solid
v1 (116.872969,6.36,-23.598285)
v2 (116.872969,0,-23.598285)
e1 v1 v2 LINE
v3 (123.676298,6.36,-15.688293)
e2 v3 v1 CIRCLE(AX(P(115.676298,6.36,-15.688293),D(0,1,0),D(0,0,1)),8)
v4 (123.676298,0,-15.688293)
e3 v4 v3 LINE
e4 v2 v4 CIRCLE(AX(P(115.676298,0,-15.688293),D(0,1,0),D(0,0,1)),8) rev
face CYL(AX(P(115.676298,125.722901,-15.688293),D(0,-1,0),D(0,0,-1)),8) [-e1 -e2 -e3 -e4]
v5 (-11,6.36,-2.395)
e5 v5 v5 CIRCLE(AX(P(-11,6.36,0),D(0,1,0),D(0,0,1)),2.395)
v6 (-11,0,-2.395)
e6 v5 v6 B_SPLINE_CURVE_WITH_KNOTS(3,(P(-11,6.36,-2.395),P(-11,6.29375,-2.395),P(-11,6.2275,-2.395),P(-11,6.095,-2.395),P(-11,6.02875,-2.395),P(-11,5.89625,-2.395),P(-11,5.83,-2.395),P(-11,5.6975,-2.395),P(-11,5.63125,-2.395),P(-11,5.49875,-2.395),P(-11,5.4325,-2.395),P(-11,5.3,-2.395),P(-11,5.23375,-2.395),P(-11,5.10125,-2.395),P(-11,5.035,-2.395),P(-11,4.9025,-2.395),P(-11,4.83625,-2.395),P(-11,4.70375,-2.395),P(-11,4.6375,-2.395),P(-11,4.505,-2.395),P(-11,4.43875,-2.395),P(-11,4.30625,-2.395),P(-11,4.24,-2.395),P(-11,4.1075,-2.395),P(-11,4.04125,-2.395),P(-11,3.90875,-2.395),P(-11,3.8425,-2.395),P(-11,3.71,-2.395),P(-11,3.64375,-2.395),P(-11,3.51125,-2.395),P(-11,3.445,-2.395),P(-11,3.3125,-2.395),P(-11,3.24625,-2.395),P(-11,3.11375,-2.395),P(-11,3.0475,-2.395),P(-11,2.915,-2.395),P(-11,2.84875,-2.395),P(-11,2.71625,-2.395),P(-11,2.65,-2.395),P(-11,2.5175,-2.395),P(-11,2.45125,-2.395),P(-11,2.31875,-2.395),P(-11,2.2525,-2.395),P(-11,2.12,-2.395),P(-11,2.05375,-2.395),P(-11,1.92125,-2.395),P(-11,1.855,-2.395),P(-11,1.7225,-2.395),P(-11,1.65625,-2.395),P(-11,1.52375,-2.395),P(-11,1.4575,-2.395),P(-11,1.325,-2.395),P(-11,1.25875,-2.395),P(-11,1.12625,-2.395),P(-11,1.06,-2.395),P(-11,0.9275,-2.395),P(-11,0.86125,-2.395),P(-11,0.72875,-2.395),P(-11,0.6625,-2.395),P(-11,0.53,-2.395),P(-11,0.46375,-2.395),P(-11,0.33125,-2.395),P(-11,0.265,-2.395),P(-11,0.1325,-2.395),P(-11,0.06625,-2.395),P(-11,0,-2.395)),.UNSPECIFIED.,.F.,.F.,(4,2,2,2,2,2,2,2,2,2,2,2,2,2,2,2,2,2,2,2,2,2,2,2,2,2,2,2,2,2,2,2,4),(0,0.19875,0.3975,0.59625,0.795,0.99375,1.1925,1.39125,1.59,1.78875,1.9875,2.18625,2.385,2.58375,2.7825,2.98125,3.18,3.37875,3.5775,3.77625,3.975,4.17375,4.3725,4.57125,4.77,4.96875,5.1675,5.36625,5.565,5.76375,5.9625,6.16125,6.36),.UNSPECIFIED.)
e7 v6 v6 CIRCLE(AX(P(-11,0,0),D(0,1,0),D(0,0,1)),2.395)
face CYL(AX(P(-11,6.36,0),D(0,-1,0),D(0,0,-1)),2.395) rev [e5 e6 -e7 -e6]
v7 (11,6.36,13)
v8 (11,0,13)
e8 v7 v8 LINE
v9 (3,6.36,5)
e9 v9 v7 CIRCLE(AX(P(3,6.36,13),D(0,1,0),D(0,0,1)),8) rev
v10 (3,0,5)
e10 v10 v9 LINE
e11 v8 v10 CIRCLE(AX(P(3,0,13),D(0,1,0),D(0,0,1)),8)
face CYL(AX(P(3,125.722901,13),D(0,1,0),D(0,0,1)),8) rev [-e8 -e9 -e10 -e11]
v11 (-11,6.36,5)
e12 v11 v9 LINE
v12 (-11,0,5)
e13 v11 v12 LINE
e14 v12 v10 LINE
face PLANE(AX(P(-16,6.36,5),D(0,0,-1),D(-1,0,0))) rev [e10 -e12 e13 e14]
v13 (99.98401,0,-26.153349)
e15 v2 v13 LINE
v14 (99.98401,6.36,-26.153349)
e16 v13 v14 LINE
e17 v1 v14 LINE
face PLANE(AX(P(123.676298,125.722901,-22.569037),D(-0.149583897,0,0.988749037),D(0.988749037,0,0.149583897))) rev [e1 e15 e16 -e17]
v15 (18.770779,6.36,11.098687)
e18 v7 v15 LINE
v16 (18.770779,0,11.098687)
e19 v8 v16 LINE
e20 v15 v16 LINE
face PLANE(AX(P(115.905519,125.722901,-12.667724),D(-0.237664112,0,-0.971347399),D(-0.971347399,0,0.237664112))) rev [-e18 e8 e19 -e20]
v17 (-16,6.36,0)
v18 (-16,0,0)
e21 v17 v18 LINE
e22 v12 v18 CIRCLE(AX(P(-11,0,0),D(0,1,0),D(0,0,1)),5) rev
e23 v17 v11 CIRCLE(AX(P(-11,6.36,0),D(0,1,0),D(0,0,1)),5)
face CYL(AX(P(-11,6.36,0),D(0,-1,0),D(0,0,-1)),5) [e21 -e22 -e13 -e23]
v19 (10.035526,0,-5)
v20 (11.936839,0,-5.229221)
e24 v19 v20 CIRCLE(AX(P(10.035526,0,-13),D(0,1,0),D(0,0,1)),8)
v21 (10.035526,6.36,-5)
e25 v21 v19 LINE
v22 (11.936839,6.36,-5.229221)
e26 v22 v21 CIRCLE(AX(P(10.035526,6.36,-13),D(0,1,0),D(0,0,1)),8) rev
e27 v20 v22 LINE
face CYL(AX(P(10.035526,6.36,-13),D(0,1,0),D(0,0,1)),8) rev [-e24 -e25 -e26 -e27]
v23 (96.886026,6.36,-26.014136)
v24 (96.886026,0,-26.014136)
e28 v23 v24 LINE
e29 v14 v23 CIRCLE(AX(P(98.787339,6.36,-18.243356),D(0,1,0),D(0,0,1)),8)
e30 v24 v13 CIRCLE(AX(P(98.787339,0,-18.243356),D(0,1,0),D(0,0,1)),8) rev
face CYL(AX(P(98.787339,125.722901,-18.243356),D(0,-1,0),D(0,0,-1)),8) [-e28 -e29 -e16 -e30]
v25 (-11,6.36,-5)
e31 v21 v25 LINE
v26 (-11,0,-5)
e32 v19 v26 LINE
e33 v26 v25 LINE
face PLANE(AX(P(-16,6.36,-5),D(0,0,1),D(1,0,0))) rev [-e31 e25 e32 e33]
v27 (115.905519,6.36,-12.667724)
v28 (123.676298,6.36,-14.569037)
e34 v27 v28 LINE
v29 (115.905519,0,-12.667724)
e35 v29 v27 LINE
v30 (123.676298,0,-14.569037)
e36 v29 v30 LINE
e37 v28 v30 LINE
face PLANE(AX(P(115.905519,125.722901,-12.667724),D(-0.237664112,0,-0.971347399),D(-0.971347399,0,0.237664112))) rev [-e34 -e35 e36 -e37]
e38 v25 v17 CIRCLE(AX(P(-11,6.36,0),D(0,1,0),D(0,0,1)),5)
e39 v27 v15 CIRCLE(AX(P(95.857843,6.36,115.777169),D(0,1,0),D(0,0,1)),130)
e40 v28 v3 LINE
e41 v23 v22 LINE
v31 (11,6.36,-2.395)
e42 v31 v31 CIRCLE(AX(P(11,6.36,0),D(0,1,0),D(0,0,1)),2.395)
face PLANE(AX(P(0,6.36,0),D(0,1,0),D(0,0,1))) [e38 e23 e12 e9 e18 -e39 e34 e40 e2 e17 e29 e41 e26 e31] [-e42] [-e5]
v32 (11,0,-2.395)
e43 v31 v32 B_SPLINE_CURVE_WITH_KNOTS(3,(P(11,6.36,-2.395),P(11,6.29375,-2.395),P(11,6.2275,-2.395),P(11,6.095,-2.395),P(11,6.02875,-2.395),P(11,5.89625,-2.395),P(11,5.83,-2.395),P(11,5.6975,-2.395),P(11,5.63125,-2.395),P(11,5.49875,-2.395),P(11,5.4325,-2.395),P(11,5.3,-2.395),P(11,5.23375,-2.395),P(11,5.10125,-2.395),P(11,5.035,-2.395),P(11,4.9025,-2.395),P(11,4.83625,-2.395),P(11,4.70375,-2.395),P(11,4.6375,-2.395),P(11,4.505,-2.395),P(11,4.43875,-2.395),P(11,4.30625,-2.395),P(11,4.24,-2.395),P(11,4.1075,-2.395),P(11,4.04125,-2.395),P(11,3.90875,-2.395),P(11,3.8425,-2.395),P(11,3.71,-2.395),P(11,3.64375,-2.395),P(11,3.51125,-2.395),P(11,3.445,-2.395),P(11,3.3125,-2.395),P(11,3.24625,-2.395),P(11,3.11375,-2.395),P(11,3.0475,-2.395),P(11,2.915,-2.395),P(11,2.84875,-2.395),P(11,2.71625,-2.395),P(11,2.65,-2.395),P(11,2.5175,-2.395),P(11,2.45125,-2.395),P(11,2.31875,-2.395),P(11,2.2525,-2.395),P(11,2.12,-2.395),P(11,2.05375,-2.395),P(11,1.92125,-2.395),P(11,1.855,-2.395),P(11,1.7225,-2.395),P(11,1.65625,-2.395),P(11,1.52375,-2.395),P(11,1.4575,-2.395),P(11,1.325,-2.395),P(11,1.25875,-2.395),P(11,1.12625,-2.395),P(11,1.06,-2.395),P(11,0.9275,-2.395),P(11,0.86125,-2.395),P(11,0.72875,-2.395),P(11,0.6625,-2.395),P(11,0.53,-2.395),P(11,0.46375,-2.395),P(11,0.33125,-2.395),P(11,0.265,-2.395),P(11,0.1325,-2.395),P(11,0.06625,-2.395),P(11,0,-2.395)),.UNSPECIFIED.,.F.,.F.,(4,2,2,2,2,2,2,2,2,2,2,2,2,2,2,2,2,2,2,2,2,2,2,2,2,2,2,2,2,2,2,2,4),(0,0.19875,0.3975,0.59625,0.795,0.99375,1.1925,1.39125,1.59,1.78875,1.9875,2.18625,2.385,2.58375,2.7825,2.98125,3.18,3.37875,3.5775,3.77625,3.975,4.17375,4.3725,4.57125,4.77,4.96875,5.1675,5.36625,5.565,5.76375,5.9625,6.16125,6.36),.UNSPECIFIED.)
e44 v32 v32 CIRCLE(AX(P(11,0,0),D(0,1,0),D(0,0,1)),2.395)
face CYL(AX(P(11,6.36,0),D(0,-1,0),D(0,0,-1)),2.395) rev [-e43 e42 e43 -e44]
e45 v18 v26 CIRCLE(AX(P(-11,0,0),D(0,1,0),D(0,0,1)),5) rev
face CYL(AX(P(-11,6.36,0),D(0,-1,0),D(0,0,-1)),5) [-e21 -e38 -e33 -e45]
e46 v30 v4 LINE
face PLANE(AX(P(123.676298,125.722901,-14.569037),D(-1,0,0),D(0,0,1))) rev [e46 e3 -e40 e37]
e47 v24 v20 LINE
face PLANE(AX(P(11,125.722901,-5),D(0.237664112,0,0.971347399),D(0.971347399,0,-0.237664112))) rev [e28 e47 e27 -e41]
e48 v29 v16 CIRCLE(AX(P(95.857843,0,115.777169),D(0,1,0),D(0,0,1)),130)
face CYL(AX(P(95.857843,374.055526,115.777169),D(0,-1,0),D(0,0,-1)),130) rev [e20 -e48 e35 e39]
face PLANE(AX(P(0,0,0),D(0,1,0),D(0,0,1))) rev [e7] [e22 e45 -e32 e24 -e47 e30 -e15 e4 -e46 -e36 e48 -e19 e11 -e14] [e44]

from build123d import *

# Parameters (mm, degrees)
SKETCH_1_W          = 32
SKETCH_1_H          = 10
SKETCH_1_R          = 2.395
EXTRUDE_2_DEPTH     = 6.36
FILLET_4_R          = 5
EXTRUDE_3_DEPTH     = 6.36
FILLET_5_R          = 8
FILLET_6_R          = 8
SKETCH_3_R          = 130
CUT_EXTRUDE_2_DEPTH = 6.36


with BuildPart() as part:
    # 草图1 → 凸台-拉伸2 (new body)
    with BuildSketch(Plane(origin=(0, 0, 0), x_dir=(1, 0, 0), z_dir=(0, 1, 0))):
        Rectangle(SKETCH_1_W, SKETCH_1_H)
        with Locations(Location((11, 0, 0), (0, 0, 90))):
            Circle(SKETCH_1_R, mode=Mode.SUBTRACT)
        with Locations(Location((-11, 0, 0), (0, 0, 90))):
            Circle(SKETCH_1_R, mode=Mode.SUBTRACT)
    extrude(amount=EXTRUDE_2_DEPTH)

    # 圆角4
    fillet_4_edges = [part.edges().sort_by_distance(p)[0] for p in [
        (-16, 3.18, 5),
        (-16, 3.18, -5),
    ]]
    fillet(fillet_4_edges, radius=FILLET_4_R - 0.0001)  # a hair under: the kernel refuses the full size

    # 草图2 → 凸台-拉伸3 (add)
    with BuildSketch(Plane(origin=(0, 0, 0), x_dir=(1, 0, 0), z_dir=(0, 1, 0))):
        Polygon((11, 5), (98.421265934, 26.389770044), (123.676298315, 22.569036945), (123.676298315, 14.569036945), (115.905519121, 12.667724053), (18.770779194, -11.098687107), (11, -13), (11, -5), (16, 0), align=None)
    extrude(amount=EXTRUDE_3_DEPTH)

    # 圆角5
    fillet_5_edges = [part.edges().sort_by_distance(p)[0] for p in [
        (123.676298315, 3.18, -22.569036945),
        (11, 3.18, 5),
    ]]
    fillet(fillet_5_edges, radius=FILLET_5_R - 0.0001)  # a hair under: the kernel refuses the full size

    # 圆角6
    fillet_6_edges = [part.edges().sort_by_distance(p)[0] for p in [
        (11, 3.18, -5),
        (98.421265934, 3.18, -26.389770044),
    ]]
    fillet(fillet_6_edges, radius=FILLET_6_R)

    # 草图3 → 切除-拉伸2 (cut)
    with BuildSketch(Plane(origin=(0, 0, 0), x_dir=(1, 0, 0), z_dir=(0, 1, 0))):
        with Locations((95.857842549, -115.777169439)):
            Circle(SKETCH_3_R)
    extrude(amount=CUT_EXTRUDE_2_DEPTH, mode=Mode.SUBTRACT)


solid = part.part
